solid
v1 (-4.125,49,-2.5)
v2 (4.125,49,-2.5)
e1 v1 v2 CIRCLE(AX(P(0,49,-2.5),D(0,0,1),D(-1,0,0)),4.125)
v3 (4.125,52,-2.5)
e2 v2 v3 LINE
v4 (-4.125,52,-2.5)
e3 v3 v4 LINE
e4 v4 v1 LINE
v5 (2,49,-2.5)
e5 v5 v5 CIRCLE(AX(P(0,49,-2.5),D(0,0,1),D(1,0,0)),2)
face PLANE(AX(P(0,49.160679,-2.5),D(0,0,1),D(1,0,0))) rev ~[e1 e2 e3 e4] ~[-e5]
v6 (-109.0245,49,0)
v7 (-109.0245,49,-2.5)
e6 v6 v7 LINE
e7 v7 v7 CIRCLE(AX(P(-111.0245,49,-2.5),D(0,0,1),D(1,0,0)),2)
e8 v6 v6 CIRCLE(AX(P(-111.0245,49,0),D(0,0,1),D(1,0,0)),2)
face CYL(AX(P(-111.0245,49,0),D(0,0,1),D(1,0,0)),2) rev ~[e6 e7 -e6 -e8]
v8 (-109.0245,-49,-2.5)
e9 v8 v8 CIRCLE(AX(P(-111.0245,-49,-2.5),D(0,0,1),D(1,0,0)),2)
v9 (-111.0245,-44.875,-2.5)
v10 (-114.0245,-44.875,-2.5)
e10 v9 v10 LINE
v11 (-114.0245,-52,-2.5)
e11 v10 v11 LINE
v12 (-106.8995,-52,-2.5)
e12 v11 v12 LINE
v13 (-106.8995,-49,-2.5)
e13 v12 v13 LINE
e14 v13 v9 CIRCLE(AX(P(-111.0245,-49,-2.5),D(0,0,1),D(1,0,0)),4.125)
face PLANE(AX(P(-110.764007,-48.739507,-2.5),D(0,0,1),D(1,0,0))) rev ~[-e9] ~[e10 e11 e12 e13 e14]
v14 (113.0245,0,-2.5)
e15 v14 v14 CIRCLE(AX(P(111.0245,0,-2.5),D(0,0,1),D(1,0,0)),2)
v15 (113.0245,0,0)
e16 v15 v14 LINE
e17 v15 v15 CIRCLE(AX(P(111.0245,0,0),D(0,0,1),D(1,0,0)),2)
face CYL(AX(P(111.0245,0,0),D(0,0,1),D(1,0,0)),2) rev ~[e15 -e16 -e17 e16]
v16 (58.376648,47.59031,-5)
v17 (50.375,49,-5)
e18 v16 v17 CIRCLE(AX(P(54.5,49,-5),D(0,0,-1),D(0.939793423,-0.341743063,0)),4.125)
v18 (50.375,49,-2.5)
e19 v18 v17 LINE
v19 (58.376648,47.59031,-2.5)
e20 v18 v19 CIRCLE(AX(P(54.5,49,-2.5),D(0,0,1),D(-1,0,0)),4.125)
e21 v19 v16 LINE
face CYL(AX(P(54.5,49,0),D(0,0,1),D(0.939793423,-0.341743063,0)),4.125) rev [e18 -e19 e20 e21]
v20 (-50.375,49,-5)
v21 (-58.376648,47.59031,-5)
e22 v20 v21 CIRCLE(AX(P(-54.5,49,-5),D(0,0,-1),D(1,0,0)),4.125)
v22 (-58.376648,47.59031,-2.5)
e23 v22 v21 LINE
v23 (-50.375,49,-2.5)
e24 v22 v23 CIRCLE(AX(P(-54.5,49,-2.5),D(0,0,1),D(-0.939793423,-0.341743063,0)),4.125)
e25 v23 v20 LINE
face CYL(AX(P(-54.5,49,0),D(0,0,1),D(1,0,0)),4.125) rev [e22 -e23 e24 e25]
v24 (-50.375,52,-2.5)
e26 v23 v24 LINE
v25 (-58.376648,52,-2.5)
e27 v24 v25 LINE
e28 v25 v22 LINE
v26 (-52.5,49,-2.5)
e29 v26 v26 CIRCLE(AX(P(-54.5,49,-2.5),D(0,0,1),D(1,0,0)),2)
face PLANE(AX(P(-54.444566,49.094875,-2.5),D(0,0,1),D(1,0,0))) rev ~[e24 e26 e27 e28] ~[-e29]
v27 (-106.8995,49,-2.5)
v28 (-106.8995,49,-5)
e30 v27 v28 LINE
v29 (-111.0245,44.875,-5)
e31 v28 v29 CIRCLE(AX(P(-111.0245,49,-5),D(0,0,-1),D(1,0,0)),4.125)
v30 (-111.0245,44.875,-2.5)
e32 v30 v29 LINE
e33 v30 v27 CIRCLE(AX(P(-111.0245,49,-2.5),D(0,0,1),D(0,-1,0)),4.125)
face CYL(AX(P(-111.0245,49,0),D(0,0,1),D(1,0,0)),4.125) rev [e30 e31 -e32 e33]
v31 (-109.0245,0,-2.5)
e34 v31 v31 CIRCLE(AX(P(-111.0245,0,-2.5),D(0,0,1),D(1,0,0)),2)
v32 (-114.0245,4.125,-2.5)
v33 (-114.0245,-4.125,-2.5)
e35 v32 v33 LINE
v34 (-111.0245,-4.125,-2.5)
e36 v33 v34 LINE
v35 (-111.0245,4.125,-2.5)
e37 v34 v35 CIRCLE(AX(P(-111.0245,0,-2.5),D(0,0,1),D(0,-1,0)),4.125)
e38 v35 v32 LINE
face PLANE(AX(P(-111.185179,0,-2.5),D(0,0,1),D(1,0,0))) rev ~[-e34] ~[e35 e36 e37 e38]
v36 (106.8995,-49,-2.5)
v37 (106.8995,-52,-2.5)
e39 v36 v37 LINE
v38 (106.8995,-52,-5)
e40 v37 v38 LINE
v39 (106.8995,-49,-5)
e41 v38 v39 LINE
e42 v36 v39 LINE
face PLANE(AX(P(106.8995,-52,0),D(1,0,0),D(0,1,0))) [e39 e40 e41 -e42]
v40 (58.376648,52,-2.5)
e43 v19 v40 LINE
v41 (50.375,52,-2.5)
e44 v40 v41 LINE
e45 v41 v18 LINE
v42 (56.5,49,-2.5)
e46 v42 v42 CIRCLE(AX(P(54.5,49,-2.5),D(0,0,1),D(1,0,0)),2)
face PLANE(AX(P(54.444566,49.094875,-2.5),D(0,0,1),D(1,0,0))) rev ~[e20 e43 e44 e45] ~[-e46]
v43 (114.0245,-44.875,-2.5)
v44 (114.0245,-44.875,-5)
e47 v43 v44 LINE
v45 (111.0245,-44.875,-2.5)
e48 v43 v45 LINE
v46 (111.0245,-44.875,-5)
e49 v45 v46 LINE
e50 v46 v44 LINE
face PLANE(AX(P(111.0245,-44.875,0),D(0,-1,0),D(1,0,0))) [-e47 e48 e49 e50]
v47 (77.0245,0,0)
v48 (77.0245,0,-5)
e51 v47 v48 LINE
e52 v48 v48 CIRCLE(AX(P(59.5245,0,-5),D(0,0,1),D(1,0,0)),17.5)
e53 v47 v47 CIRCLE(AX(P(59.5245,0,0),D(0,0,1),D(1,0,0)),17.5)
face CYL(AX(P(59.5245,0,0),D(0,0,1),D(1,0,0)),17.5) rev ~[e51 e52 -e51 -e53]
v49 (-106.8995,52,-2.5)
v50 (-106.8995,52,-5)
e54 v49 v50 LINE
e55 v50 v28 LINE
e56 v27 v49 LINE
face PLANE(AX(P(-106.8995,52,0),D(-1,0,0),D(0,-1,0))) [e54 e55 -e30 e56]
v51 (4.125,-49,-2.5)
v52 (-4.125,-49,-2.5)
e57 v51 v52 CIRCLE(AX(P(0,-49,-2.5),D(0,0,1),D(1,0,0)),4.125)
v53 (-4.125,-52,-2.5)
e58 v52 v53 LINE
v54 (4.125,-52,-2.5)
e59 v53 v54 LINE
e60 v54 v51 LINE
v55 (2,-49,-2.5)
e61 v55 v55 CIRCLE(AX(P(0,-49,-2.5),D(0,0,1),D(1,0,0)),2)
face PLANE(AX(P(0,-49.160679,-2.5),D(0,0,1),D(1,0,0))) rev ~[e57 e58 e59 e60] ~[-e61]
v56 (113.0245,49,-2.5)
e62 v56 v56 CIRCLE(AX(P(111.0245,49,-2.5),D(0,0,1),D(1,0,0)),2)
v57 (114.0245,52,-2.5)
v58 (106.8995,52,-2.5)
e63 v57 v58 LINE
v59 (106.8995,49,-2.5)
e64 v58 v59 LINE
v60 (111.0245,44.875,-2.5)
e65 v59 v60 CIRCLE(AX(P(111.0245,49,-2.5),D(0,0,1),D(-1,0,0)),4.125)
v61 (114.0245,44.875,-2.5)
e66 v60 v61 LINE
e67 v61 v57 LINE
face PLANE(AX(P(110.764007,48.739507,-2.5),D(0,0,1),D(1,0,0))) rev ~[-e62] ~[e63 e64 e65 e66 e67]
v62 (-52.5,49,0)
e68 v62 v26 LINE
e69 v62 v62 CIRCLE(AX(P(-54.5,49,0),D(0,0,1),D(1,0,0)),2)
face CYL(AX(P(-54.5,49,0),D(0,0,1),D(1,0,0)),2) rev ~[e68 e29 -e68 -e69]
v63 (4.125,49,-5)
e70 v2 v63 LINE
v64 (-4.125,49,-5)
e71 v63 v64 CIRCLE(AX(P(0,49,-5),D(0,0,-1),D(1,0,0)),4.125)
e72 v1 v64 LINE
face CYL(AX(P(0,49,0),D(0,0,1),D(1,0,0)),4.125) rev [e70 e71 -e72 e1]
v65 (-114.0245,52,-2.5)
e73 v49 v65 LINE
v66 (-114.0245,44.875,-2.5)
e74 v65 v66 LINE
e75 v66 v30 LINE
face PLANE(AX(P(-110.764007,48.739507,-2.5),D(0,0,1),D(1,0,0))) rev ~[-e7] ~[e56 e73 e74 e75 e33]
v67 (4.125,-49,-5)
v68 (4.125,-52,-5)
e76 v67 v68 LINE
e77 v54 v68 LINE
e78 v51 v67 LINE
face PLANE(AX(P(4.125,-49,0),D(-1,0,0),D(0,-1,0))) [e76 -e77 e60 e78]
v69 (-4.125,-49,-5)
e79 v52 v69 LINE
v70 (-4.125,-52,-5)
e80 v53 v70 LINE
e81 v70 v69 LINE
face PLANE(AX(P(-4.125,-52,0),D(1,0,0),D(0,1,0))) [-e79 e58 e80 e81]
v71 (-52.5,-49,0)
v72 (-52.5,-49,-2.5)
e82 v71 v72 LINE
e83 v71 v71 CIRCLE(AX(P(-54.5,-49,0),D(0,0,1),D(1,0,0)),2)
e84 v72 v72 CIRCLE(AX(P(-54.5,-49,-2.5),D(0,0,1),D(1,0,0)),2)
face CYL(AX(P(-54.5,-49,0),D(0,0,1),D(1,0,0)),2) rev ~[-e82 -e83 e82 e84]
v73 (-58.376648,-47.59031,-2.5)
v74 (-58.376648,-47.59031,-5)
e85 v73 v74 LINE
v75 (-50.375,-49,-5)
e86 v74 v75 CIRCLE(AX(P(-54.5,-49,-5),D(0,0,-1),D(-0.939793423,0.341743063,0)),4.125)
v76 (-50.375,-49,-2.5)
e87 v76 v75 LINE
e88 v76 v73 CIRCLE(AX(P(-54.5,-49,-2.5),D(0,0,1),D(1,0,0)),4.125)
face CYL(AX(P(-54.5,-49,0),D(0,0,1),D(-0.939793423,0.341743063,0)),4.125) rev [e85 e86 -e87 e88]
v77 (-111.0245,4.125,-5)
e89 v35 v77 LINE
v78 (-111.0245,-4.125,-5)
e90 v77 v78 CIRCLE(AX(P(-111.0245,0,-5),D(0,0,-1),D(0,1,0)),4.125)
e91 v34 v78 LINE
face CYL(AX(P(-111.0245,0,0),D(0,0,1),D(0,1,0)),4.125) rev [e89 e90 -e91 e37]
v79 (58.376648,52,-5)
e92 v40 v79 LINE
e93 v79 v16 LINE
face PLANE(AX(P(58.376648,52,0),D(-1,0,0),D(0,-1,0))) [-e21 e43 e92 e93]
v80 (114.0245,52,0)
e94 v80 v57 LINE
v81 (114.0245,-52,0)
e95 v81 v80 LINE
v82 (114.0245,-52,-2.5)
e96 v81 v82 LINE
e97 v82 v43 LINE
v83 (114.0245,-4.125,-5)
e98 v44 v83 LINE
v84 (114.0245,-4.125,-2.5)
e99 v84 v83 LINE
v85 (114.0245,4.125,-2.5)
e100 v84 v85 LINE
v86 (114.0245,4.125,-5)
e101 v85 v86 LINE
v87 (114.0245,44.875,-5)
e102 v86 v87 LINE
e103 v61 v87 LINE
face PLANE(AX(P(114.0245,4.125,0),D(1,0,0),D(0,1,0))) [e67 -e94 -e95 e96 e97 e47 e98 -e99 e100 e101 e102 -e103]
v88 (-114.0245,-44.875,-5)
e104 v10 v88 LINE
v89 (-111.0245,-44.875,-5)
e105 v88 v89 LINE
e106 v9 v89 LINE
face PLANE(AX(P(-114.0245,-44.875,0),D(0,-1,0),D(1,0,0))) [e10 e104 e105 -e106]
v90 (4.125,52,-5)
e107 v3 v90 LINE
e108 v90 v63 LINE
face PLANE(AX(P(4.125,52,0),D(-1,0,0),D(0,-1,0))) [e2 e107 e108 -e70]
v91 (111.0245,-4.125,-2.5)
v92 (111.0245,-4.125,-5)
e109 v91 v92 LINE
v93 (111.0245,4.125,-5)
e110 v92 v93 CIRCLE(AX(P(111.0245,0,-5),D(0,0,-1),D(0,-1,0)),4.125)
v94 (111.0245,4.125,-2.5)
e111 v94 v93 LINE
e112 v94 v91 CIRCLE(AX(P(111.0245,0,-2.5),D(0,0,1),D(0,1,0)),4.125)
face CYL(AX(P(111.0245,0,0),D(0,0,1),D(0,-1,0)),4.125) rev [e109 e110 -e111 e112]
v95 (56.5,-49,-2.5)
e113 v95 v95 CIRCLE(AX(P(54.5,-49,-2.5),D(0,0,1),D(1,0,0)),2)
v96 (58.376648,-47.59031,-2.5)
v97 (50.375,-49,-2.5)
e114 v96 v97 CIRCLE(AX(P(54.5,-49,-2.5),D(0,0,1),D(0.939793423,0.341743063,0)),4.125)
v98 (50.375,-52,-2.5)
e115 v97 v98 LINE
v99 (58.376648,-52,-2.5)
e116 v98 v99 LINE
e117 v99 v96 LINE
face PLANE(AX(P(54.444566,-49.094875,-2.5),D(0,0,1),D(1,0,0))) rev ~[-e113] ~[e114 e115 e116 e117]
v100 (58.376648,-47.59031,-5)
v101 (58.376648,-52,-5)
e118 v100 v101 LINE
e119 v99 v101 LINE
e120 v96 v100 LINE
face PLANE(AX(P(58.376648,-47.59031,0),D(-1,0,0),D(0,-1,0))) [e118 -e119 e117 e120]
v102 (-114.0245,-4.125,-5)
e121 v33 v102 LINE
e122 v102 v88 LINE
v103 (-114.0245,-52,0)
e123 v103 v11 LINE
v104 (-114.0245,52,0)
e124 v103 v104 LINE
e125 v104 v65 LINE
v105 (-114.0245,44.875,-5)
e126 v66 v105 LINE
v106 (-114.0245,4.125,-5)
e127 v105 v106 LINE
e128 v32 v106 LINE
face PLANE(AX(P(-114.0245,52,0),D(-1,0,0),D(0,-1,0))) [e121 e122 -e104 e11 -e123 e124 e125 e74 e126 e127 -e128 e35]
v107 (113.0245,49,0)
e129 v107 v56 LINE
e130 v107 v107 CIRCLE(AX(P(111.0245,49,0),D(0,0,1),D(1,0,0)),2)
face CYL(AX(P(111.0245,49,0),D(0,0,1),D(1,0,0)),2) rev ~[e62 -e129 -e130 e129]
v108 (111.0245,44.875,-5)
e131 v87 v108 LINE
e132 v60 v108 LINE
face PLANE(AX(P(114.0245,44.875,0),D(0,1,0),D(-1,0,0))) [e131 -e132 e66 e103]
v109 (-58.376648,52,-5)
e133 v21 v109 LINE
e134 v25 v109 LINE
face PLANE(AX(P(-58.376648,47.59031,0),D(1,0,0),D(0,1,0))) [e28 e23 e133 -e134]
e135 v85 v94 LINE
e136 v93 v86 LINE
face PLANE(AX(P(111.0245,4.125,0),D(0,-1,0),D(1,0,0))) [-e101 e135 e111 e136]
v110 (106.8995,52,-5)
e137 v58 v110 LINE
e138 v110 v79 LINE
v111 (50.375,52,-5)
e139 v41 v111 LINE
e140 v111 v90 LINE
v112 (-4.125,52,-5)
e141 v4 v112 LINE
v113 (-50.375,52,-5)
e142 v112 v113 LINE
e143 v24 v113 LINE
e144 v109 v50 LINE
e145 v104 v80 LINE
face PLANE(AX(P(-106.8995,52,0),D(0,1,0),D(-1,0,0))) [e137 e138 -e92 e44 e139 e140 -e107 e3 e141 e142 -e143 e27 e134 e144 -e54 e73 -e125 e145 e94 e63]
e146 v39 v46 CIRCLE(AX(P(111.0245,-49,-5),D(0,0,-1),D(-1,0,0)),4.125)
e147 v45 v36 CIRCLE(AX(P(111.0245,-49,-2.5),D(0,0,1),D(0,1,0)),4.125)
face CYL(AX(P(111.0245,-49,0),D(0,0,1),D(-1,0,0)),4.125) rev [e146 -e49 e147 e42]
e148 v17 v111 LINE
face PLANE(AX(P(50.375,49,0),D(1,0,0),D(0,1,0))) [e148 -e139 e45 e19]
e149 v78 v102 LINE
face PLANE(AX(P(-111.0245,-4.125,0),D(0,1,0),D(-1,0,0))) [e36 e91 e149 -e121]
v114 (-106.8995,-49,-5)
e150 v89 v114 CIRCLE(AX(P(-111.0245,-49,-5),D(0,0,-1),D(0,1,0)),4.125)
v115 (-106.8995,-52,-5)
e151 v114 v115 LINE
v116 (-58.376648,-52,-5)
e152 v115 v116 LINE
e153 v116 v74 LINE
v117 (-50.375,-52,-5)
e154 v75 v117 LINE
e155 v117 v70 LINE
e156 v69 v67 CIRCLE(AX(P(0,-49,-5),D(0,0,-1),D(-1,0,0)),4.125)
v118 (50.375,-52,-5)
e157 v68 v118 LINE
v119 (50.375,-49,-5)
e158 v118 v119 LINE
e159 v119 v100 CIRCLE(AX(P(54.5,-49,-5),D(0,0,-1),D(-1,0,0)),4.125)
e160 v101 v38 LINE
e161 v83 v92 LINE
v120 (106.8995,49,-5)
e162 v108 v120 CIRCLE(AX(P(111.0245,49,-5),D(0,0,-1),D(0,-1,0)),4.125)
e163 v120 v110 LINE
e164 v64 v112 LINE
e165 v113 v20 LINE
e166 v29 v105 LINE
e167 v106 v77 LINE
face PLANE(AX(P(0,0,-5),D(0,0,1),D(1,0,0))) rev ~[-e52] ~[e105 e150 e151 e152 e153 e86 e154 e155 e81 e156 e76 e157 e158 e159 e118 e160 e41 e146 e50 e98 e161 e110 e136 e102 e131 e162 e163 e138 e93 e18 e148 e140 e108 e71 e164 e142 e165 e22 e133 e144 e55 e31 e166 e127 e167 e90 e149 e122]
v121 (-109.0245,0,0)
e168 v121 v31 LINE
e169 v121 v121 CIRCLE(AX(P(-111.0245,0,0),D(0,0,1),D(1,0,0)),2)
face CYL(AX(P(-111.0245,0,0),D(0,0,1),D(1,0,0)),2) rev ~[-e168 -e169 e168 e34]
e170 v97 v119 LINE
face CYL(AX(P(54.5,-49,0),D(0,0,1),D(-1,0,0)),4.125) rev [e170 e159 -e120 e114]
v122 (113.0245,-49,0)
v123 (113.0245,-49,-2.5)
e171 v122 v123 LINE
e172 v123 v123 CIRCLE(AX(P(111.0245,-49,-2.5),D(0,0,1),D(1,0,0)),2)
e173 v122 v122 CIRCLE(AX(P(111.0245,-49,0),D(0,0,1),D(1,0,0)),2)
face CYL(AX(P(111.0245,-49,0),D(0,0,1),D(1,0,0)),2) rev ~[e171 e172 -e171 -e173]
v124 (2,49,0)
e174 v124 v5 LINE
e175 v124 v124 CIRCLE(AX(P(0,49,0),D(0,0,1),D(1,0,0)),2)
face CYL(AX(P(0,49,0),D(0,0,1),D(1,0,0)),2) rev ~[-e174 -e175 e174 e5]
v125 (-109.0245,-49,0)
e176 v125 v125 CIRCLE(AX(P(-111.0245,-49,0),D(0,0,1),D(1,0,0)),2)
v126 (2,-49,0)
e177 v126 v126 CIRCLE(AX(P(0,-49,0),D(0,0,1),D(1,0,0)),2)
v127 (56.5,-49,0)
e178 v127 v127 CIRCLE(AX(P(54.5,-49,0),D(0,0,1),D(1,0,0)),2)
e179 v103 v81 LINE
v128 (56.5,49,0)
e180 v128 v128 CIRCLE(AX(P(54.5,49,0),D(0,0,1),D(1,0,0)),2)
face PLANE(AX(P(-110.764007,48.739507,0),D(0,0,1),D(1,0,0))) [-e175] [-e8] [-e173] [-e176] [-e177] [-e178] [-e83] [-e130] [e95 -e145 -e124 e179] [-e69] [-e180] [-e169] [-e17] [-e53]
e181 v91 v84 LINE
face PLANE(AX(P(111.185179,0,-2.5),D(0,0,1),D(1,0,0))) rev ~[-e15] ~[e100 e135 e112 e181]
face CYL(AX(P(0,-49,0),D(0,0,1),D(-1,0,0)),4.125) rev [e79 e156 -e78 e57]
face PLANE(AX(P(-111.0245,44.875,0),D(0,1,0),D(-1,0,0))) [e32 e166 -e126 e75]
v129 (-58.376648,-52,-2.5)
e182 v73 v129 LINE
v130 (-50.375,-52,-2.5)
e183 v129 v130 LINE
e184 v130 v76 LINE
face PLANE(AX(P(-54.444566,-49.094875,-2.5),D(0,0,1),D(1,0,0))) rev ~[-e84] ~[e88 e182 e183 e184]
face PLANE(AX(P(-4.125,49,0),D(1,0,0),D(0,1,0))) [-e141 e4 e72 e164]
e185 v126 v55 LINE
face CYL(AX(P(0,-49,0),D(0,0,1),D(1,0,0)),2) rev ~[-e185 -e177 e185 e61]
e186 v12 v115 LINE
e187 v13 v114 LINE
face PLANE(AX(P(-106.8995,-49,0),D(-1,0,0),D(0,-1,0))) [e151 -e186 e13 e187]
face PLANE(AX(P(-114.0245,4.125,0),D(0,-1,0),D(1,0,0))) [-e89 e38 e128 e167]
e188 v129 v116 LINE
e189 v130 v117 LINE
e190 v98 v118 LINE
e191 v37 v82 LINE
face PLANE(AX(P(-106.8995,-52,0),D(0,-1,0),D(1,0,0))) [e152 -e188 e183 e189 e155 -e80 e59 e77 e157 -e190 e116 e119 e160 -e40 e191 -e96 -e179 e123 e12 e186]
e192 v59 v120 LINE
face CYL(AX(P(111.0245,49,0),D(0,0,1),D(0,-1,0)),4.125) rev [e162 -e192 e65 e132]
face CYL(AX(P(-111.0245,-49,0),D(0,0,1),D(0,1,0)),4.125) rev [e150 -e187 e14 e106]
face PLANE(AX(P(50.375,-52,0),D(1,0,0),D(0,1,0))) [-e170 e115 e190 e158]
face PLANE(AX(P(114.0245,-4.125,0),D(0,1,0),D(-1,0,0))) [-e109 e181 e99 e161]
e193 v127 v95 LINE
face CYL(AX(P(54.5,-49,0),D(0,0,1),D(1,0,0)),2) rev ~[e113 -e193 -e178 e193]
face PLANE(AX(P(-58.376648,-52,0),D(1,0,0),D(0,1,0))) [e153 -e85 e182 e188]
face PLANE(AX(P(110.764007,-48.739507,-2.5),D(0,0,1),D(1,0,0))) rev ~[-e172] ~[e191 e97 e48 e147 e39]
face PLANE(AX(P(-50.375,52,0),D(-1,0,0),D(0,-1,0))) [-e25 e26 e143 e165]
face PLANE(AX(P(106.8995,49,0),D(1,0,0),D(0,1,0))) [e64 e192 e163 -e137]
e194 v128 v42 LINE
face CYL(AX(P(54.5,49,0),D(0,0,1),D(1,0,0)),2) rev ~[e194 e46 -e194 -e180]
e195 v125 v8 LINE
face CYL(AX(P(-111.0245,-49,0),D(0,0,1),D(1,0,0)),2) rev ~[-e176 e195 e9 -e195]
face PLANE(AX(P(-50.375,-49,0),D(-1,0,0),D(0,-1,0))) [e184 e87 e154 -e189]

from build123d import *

# Parameters (mm, degrees)
F0_R     = 23.5
F0_R_2   = 17.5
F1_DEPTH = 5
F0_R_3   = 2
F2_DEPTH = 2.5


# Not quite as in the source:
# - a feature names something its author has since deleted; it is built from what else it names


with BuildPart() as f1:
    # F0 (on Top) → F1 (new body)
    with BuildSketch(Plane.XY):
        with BuildLine():
            Line((-58.3766478719, 52), (-106.8995, 52))
            Line((-106.8995, 52), (-106.8995, 49))
            ThreePointArc((-106.8995, 49), (-108.1076845276, 46.0831845276), (-111.0245, 44.875))
            Line((-111.0245, 44.875), (-114.0245, 44.875))
            Line((-114.0245, 44.875), (-114.0245, 4.125))
            Line((-114.0245, 4.125), (-111.0245, 4.125))
            ThreePointArc((-111.0245, 4.125), (-106.8995, 0), (-111.0245, -4.125))
            Line((-111.0245, -4.125), (-114.0245, -4.125))
            Line((-114.0245, -4.125), (-114.0245, -44.875))
            Line((-114.0245, -44.875), (-111.0245, -44.875))
            ThreePointArc((-111.0245, -44.875), (-108.1076845276, -46.0831845276), (-106.8995, -49))
            Line((-106.8995, -49), (-106.8995, -52))
            Line((-106.8995, -52), (-58.3766478719, -52))
            Line((-58.3766478719, -52), (-58.3766478719, -47.5903098648))
            ThreePointArc((-58.3766478719, -47.5903098648), (-53.7843001577, -44.9375624638), (-50.375, -49))
            Line((-50.375, -49), (-50.375, -52))
            Line((-50.375, -52), (-4.125, -52))
            Line((-4.125, -52), (-4.125, -49))
            ThreePointArc((-4.125, -49), (0, -44.875), (4.125, -49))
            Line((4.125, -49), (4.125, -52))
            Line((4.125, -52), (50.375, -52))
            Line((50.375, -52), (50.375, -49))
            ThreePointArc((50.375, -49), (53.7843001577, -44.9375624638), (58.3766478719, -47.5903098648))
            Line((58.3766478719, -47.5903098648), (58.3766478719, -52))
            Line((58.3766478719, -52), (106.8995, -52))
            Line((106.8995, -52), (106.8995, -49))
            ThreePointArc((106.8995, -49), (108.1076845276, -46.0831845276), (111.0245, -44.875))
            Line((111.0245, -44.875), (114.0245, -44.875))
            Line((114.0245, -44.875), (114.0245, -4.125))
            Line((114.0245, -4.125), (111.0245, -4.125))
            ThreePointArc((111.0245, -4.125), (106.8995, 0), (111.0245, 4.125))
            Line((111.0245, 4.125), (114.0245, 4.125))
            Line((114.0245, 4.125), (114.0245, 44.875))
            Line((114.0245, 44.875), (111.0245, 44.875))
            ThreePointArc((111.0245, 44.875), (108.1076845276, 46.0831845276), (106.8995, 49))
            Line((106.8995, 49), (106.8995, 52))
            Line((106.8995, 52), (58.3766478719, 52))
            Line((58.3766478719, 52), (58.3766478719, 47.5903098648))
            ThreePointArc((58.3766478719, 47.5903098648), (53.7843001577, 44.9375624638), (50.375, 49))
            Line((50.375, 49), (50.375, 52))
            Line((50.375, 52), (4.125, 52))
            Line((4.125, 52), (4.125, 49))
            ThreePointArc((4.125, 49), (0, 44.875), (-4.125, 49))
            Line((-4.125, 49), (-4.125, 52))
            Line((-4.125, 52), (-50.375, 52))
            Line((-50.375, 52), (-50.375, 49))
            ThreePointArc((-50.375, 49), (-53.7843001577, 44.9375624638), (-58.3766478719, 47.5903098648))
            Line((-58.3766478719, 47.5903098648), (-58.3766478719, 52))
        make_face()
        with Locations((59.5245, 0)):
            Circle(F0_R, mode=Mode.SUBTRACT)
        with Locations((59.5245, 0)):
            Circle(F0_R)
        with Locations((59.5245, 0)):
            Circle(F0_R_2, mode=Mode.SUBTRACT)
    extrude(amount=-F1_DEPTH)

    # F0 (on Top) → F2 (join)
    with BuildSketch(Plane.XY):
        with BuildLine():
            Line((-106.8995, 52), (-114.0245, 52))
            Line((-114.0245, 52), (-114.0245, 44.875))
            Line((-114.0245, 44.875), (-111.0245, 44.875))
            ThreePointArc((-111.0245, 44.875), (-108.1076845276, 46.0831845276), (-106.8995, 49))
            Line((-106.8995, 49), (-106.8995, 52))
        make_face()
        with Locations((-111.0245, 49)):
            Circle(F0_R_3, mode=Mode.SUBTRACT)
        with BuildLine():
            Line((-111.0245, 4.125), (-114.0245, 4.125))
            Line((-114.0245, 4.125), (-114.0245, -4.125))
            Line((-114.0245, -4.125), (-111.0245, -4.125))
            ThreePointArc((-111.0245, -4.125), (-106.8995, 0), (-111.0245, 4.125))
        make_face()
        with Locations((-111.0245, 0)):
            Circle(F0_R_3, mode=Mode.SUBTRACT)
        with BuildLine():
            Line((-111.0245, -44.875), (-114.0245, -44.875))
            Line((-114.0245, -44.875), (-114.0245, -52))
            Line((-114.0245, -52), (-106.8995, -52))
            Line((-106.8995, -52), (-106.8995, -49))
            ThreePointArc((-106.8995, -49), (-108.1076845276, -46.0831845276), (-111.0245, -44.875))
        make_face()
        with Locations((-111.0245, -49)):
            Circle(F0_R_3, mode=Mode.SUBTRACT)
        with BuildLine():
            Line((-58.3766478719, -47.5903098648), (-58.3766478719, -52))
            Line((-58.3766478719, -52), (-50.375, -52))
            Line((-50.375, -52), (-50.375, -49))
            ThreePointArc((-50.375, -49), (-53.7843001577, -44.9375624638), (-58.3766478719, -47.5903098648))
        make_face()
        with Locations((-54.5, -49)):
            Circle(F0_R_3, mode=Mode.SUBTRACT)
        with BuildLine():
            Line((-4.125, -49), (-4.125, -52))
            Line((-4.125, -52), (4.125, -52))
            Line((4.125, -52), (4.125, -49))
            ThreePointArc((4.125, -49), (0, -44.875), (-4.125, -49))
        make_face()
        with Locations((0, -49)):
            Circle(F0_R_3, mode=Mode.SUBTRACT)
        with BuildLine():
            Line((50.375, -49), (50.375, -52))
            Line((50.375, -52), (58.3766478719, -52))
            Line((58.3766478719, -52), (58.3766478719, -47.5903098648))
            ThreePointArc((58.3766478719, -47.5903098648), (53.7843001577, -44.9375624638), (50.375, -49))
        make_face()
        with Locations((54.5, -49)):
            Circle(F0_R_3, mode=Mode.SUBTRACT)
        with BuildLine():
            Line((114.0245, -52), (114.0245, -44.875))
            Line((114.0245, -44.875), (111.0245, -44.875))
            ThreePointArc((111.0245, -44.875), (108.1076845276, -46.0831845276), (106.8995, -49))
            Line((106.8995, -49), (106.8995, -52))
            Line((106.8995, -52), (114.0245, -52))
        make_face()
        with Locations((111.0245, -49)):
            Circle(F0_R_3, mode=Mode.SUBTRACT)
        with BuildLine():
            Line((114.0245, -4.125), (114.0245, 4.125))
            Line((114.0245, 4.125), (111.0245, 4.125))
            ThreePointArc((111.0245, 4.125), (106.8995, 0), (111.0245, -4.125))
            Line((111.0245, -4.125), (114.0245, -4.125))
        make_face()
        with Locations((111.0245, 0)):
            Circle(F0_R_3, mode=Mode.SUBTRACT)
        with BuildLine():
            Line((114.0245, 52), (106.8995, 52))
            Line((106.8995, 52), (106.8995, 49))
            ThreePointArc((106.8995, 49), (108.1076845276, 46.0831845276), (111.0245, 44.875))
            Line((111.0245, 44.875), (114.0245, 44.875))
            Line((114.0245, 44.875), (114.0245, 52))
        make_face()
        with Locations((111.0245, 49)):
            Circle(F0_R_3, mode=Mode.SUBTRACT)
        with BuildLine():
            Line((58.3766478719, 52), (50.375, 52))
            Line((50.375, 52), (50.375, 49))
            ThreePointArc((50.375, 49), (53.7843001577, 44.9375624638), (58.3766478719, 47.5903098648))
            Line((58.3766478719, 47.5903098648), (58.3766478719, 52))
        make_face()
        with Locations((54.5, 49)):
            Circle(F0_R_3, mode=Mode.SUBTRACT)
        with BuildLine():
            Line((4.125, 52), (-4.125, 52))
            Line((-4.125, 52), (-4.125, 49))
            ThreePointArc((-4.125, 49), (0, 44.875), (4.125, 49))
            Line((4.125, 49), (4.125, 52))
        make_face()
        with Locations((0, 49)):
            Circle(F0_R_3, mode=Mode.SUBTRACT)
        with BuildLine():
            Line((-50.375, 52), (-58.3766478719, 52))
            Line((-58.3766478719, 52), (-58.3766478719, 47.5903098648))
            ThreePointArc((-58.3766478719, 47.5903098648), (-53.7843001577, 44.9375624638), (-50.375, 49))
            Line((-50.375, 49), (-50.375, 52))
        make_face()
        with Locations((-54.5, 49)):
            Circle(F0_R_3, mode=Mode.SUBTRACT)
    extrude(amount=-F2_DEPTH)


solid = f1.part
